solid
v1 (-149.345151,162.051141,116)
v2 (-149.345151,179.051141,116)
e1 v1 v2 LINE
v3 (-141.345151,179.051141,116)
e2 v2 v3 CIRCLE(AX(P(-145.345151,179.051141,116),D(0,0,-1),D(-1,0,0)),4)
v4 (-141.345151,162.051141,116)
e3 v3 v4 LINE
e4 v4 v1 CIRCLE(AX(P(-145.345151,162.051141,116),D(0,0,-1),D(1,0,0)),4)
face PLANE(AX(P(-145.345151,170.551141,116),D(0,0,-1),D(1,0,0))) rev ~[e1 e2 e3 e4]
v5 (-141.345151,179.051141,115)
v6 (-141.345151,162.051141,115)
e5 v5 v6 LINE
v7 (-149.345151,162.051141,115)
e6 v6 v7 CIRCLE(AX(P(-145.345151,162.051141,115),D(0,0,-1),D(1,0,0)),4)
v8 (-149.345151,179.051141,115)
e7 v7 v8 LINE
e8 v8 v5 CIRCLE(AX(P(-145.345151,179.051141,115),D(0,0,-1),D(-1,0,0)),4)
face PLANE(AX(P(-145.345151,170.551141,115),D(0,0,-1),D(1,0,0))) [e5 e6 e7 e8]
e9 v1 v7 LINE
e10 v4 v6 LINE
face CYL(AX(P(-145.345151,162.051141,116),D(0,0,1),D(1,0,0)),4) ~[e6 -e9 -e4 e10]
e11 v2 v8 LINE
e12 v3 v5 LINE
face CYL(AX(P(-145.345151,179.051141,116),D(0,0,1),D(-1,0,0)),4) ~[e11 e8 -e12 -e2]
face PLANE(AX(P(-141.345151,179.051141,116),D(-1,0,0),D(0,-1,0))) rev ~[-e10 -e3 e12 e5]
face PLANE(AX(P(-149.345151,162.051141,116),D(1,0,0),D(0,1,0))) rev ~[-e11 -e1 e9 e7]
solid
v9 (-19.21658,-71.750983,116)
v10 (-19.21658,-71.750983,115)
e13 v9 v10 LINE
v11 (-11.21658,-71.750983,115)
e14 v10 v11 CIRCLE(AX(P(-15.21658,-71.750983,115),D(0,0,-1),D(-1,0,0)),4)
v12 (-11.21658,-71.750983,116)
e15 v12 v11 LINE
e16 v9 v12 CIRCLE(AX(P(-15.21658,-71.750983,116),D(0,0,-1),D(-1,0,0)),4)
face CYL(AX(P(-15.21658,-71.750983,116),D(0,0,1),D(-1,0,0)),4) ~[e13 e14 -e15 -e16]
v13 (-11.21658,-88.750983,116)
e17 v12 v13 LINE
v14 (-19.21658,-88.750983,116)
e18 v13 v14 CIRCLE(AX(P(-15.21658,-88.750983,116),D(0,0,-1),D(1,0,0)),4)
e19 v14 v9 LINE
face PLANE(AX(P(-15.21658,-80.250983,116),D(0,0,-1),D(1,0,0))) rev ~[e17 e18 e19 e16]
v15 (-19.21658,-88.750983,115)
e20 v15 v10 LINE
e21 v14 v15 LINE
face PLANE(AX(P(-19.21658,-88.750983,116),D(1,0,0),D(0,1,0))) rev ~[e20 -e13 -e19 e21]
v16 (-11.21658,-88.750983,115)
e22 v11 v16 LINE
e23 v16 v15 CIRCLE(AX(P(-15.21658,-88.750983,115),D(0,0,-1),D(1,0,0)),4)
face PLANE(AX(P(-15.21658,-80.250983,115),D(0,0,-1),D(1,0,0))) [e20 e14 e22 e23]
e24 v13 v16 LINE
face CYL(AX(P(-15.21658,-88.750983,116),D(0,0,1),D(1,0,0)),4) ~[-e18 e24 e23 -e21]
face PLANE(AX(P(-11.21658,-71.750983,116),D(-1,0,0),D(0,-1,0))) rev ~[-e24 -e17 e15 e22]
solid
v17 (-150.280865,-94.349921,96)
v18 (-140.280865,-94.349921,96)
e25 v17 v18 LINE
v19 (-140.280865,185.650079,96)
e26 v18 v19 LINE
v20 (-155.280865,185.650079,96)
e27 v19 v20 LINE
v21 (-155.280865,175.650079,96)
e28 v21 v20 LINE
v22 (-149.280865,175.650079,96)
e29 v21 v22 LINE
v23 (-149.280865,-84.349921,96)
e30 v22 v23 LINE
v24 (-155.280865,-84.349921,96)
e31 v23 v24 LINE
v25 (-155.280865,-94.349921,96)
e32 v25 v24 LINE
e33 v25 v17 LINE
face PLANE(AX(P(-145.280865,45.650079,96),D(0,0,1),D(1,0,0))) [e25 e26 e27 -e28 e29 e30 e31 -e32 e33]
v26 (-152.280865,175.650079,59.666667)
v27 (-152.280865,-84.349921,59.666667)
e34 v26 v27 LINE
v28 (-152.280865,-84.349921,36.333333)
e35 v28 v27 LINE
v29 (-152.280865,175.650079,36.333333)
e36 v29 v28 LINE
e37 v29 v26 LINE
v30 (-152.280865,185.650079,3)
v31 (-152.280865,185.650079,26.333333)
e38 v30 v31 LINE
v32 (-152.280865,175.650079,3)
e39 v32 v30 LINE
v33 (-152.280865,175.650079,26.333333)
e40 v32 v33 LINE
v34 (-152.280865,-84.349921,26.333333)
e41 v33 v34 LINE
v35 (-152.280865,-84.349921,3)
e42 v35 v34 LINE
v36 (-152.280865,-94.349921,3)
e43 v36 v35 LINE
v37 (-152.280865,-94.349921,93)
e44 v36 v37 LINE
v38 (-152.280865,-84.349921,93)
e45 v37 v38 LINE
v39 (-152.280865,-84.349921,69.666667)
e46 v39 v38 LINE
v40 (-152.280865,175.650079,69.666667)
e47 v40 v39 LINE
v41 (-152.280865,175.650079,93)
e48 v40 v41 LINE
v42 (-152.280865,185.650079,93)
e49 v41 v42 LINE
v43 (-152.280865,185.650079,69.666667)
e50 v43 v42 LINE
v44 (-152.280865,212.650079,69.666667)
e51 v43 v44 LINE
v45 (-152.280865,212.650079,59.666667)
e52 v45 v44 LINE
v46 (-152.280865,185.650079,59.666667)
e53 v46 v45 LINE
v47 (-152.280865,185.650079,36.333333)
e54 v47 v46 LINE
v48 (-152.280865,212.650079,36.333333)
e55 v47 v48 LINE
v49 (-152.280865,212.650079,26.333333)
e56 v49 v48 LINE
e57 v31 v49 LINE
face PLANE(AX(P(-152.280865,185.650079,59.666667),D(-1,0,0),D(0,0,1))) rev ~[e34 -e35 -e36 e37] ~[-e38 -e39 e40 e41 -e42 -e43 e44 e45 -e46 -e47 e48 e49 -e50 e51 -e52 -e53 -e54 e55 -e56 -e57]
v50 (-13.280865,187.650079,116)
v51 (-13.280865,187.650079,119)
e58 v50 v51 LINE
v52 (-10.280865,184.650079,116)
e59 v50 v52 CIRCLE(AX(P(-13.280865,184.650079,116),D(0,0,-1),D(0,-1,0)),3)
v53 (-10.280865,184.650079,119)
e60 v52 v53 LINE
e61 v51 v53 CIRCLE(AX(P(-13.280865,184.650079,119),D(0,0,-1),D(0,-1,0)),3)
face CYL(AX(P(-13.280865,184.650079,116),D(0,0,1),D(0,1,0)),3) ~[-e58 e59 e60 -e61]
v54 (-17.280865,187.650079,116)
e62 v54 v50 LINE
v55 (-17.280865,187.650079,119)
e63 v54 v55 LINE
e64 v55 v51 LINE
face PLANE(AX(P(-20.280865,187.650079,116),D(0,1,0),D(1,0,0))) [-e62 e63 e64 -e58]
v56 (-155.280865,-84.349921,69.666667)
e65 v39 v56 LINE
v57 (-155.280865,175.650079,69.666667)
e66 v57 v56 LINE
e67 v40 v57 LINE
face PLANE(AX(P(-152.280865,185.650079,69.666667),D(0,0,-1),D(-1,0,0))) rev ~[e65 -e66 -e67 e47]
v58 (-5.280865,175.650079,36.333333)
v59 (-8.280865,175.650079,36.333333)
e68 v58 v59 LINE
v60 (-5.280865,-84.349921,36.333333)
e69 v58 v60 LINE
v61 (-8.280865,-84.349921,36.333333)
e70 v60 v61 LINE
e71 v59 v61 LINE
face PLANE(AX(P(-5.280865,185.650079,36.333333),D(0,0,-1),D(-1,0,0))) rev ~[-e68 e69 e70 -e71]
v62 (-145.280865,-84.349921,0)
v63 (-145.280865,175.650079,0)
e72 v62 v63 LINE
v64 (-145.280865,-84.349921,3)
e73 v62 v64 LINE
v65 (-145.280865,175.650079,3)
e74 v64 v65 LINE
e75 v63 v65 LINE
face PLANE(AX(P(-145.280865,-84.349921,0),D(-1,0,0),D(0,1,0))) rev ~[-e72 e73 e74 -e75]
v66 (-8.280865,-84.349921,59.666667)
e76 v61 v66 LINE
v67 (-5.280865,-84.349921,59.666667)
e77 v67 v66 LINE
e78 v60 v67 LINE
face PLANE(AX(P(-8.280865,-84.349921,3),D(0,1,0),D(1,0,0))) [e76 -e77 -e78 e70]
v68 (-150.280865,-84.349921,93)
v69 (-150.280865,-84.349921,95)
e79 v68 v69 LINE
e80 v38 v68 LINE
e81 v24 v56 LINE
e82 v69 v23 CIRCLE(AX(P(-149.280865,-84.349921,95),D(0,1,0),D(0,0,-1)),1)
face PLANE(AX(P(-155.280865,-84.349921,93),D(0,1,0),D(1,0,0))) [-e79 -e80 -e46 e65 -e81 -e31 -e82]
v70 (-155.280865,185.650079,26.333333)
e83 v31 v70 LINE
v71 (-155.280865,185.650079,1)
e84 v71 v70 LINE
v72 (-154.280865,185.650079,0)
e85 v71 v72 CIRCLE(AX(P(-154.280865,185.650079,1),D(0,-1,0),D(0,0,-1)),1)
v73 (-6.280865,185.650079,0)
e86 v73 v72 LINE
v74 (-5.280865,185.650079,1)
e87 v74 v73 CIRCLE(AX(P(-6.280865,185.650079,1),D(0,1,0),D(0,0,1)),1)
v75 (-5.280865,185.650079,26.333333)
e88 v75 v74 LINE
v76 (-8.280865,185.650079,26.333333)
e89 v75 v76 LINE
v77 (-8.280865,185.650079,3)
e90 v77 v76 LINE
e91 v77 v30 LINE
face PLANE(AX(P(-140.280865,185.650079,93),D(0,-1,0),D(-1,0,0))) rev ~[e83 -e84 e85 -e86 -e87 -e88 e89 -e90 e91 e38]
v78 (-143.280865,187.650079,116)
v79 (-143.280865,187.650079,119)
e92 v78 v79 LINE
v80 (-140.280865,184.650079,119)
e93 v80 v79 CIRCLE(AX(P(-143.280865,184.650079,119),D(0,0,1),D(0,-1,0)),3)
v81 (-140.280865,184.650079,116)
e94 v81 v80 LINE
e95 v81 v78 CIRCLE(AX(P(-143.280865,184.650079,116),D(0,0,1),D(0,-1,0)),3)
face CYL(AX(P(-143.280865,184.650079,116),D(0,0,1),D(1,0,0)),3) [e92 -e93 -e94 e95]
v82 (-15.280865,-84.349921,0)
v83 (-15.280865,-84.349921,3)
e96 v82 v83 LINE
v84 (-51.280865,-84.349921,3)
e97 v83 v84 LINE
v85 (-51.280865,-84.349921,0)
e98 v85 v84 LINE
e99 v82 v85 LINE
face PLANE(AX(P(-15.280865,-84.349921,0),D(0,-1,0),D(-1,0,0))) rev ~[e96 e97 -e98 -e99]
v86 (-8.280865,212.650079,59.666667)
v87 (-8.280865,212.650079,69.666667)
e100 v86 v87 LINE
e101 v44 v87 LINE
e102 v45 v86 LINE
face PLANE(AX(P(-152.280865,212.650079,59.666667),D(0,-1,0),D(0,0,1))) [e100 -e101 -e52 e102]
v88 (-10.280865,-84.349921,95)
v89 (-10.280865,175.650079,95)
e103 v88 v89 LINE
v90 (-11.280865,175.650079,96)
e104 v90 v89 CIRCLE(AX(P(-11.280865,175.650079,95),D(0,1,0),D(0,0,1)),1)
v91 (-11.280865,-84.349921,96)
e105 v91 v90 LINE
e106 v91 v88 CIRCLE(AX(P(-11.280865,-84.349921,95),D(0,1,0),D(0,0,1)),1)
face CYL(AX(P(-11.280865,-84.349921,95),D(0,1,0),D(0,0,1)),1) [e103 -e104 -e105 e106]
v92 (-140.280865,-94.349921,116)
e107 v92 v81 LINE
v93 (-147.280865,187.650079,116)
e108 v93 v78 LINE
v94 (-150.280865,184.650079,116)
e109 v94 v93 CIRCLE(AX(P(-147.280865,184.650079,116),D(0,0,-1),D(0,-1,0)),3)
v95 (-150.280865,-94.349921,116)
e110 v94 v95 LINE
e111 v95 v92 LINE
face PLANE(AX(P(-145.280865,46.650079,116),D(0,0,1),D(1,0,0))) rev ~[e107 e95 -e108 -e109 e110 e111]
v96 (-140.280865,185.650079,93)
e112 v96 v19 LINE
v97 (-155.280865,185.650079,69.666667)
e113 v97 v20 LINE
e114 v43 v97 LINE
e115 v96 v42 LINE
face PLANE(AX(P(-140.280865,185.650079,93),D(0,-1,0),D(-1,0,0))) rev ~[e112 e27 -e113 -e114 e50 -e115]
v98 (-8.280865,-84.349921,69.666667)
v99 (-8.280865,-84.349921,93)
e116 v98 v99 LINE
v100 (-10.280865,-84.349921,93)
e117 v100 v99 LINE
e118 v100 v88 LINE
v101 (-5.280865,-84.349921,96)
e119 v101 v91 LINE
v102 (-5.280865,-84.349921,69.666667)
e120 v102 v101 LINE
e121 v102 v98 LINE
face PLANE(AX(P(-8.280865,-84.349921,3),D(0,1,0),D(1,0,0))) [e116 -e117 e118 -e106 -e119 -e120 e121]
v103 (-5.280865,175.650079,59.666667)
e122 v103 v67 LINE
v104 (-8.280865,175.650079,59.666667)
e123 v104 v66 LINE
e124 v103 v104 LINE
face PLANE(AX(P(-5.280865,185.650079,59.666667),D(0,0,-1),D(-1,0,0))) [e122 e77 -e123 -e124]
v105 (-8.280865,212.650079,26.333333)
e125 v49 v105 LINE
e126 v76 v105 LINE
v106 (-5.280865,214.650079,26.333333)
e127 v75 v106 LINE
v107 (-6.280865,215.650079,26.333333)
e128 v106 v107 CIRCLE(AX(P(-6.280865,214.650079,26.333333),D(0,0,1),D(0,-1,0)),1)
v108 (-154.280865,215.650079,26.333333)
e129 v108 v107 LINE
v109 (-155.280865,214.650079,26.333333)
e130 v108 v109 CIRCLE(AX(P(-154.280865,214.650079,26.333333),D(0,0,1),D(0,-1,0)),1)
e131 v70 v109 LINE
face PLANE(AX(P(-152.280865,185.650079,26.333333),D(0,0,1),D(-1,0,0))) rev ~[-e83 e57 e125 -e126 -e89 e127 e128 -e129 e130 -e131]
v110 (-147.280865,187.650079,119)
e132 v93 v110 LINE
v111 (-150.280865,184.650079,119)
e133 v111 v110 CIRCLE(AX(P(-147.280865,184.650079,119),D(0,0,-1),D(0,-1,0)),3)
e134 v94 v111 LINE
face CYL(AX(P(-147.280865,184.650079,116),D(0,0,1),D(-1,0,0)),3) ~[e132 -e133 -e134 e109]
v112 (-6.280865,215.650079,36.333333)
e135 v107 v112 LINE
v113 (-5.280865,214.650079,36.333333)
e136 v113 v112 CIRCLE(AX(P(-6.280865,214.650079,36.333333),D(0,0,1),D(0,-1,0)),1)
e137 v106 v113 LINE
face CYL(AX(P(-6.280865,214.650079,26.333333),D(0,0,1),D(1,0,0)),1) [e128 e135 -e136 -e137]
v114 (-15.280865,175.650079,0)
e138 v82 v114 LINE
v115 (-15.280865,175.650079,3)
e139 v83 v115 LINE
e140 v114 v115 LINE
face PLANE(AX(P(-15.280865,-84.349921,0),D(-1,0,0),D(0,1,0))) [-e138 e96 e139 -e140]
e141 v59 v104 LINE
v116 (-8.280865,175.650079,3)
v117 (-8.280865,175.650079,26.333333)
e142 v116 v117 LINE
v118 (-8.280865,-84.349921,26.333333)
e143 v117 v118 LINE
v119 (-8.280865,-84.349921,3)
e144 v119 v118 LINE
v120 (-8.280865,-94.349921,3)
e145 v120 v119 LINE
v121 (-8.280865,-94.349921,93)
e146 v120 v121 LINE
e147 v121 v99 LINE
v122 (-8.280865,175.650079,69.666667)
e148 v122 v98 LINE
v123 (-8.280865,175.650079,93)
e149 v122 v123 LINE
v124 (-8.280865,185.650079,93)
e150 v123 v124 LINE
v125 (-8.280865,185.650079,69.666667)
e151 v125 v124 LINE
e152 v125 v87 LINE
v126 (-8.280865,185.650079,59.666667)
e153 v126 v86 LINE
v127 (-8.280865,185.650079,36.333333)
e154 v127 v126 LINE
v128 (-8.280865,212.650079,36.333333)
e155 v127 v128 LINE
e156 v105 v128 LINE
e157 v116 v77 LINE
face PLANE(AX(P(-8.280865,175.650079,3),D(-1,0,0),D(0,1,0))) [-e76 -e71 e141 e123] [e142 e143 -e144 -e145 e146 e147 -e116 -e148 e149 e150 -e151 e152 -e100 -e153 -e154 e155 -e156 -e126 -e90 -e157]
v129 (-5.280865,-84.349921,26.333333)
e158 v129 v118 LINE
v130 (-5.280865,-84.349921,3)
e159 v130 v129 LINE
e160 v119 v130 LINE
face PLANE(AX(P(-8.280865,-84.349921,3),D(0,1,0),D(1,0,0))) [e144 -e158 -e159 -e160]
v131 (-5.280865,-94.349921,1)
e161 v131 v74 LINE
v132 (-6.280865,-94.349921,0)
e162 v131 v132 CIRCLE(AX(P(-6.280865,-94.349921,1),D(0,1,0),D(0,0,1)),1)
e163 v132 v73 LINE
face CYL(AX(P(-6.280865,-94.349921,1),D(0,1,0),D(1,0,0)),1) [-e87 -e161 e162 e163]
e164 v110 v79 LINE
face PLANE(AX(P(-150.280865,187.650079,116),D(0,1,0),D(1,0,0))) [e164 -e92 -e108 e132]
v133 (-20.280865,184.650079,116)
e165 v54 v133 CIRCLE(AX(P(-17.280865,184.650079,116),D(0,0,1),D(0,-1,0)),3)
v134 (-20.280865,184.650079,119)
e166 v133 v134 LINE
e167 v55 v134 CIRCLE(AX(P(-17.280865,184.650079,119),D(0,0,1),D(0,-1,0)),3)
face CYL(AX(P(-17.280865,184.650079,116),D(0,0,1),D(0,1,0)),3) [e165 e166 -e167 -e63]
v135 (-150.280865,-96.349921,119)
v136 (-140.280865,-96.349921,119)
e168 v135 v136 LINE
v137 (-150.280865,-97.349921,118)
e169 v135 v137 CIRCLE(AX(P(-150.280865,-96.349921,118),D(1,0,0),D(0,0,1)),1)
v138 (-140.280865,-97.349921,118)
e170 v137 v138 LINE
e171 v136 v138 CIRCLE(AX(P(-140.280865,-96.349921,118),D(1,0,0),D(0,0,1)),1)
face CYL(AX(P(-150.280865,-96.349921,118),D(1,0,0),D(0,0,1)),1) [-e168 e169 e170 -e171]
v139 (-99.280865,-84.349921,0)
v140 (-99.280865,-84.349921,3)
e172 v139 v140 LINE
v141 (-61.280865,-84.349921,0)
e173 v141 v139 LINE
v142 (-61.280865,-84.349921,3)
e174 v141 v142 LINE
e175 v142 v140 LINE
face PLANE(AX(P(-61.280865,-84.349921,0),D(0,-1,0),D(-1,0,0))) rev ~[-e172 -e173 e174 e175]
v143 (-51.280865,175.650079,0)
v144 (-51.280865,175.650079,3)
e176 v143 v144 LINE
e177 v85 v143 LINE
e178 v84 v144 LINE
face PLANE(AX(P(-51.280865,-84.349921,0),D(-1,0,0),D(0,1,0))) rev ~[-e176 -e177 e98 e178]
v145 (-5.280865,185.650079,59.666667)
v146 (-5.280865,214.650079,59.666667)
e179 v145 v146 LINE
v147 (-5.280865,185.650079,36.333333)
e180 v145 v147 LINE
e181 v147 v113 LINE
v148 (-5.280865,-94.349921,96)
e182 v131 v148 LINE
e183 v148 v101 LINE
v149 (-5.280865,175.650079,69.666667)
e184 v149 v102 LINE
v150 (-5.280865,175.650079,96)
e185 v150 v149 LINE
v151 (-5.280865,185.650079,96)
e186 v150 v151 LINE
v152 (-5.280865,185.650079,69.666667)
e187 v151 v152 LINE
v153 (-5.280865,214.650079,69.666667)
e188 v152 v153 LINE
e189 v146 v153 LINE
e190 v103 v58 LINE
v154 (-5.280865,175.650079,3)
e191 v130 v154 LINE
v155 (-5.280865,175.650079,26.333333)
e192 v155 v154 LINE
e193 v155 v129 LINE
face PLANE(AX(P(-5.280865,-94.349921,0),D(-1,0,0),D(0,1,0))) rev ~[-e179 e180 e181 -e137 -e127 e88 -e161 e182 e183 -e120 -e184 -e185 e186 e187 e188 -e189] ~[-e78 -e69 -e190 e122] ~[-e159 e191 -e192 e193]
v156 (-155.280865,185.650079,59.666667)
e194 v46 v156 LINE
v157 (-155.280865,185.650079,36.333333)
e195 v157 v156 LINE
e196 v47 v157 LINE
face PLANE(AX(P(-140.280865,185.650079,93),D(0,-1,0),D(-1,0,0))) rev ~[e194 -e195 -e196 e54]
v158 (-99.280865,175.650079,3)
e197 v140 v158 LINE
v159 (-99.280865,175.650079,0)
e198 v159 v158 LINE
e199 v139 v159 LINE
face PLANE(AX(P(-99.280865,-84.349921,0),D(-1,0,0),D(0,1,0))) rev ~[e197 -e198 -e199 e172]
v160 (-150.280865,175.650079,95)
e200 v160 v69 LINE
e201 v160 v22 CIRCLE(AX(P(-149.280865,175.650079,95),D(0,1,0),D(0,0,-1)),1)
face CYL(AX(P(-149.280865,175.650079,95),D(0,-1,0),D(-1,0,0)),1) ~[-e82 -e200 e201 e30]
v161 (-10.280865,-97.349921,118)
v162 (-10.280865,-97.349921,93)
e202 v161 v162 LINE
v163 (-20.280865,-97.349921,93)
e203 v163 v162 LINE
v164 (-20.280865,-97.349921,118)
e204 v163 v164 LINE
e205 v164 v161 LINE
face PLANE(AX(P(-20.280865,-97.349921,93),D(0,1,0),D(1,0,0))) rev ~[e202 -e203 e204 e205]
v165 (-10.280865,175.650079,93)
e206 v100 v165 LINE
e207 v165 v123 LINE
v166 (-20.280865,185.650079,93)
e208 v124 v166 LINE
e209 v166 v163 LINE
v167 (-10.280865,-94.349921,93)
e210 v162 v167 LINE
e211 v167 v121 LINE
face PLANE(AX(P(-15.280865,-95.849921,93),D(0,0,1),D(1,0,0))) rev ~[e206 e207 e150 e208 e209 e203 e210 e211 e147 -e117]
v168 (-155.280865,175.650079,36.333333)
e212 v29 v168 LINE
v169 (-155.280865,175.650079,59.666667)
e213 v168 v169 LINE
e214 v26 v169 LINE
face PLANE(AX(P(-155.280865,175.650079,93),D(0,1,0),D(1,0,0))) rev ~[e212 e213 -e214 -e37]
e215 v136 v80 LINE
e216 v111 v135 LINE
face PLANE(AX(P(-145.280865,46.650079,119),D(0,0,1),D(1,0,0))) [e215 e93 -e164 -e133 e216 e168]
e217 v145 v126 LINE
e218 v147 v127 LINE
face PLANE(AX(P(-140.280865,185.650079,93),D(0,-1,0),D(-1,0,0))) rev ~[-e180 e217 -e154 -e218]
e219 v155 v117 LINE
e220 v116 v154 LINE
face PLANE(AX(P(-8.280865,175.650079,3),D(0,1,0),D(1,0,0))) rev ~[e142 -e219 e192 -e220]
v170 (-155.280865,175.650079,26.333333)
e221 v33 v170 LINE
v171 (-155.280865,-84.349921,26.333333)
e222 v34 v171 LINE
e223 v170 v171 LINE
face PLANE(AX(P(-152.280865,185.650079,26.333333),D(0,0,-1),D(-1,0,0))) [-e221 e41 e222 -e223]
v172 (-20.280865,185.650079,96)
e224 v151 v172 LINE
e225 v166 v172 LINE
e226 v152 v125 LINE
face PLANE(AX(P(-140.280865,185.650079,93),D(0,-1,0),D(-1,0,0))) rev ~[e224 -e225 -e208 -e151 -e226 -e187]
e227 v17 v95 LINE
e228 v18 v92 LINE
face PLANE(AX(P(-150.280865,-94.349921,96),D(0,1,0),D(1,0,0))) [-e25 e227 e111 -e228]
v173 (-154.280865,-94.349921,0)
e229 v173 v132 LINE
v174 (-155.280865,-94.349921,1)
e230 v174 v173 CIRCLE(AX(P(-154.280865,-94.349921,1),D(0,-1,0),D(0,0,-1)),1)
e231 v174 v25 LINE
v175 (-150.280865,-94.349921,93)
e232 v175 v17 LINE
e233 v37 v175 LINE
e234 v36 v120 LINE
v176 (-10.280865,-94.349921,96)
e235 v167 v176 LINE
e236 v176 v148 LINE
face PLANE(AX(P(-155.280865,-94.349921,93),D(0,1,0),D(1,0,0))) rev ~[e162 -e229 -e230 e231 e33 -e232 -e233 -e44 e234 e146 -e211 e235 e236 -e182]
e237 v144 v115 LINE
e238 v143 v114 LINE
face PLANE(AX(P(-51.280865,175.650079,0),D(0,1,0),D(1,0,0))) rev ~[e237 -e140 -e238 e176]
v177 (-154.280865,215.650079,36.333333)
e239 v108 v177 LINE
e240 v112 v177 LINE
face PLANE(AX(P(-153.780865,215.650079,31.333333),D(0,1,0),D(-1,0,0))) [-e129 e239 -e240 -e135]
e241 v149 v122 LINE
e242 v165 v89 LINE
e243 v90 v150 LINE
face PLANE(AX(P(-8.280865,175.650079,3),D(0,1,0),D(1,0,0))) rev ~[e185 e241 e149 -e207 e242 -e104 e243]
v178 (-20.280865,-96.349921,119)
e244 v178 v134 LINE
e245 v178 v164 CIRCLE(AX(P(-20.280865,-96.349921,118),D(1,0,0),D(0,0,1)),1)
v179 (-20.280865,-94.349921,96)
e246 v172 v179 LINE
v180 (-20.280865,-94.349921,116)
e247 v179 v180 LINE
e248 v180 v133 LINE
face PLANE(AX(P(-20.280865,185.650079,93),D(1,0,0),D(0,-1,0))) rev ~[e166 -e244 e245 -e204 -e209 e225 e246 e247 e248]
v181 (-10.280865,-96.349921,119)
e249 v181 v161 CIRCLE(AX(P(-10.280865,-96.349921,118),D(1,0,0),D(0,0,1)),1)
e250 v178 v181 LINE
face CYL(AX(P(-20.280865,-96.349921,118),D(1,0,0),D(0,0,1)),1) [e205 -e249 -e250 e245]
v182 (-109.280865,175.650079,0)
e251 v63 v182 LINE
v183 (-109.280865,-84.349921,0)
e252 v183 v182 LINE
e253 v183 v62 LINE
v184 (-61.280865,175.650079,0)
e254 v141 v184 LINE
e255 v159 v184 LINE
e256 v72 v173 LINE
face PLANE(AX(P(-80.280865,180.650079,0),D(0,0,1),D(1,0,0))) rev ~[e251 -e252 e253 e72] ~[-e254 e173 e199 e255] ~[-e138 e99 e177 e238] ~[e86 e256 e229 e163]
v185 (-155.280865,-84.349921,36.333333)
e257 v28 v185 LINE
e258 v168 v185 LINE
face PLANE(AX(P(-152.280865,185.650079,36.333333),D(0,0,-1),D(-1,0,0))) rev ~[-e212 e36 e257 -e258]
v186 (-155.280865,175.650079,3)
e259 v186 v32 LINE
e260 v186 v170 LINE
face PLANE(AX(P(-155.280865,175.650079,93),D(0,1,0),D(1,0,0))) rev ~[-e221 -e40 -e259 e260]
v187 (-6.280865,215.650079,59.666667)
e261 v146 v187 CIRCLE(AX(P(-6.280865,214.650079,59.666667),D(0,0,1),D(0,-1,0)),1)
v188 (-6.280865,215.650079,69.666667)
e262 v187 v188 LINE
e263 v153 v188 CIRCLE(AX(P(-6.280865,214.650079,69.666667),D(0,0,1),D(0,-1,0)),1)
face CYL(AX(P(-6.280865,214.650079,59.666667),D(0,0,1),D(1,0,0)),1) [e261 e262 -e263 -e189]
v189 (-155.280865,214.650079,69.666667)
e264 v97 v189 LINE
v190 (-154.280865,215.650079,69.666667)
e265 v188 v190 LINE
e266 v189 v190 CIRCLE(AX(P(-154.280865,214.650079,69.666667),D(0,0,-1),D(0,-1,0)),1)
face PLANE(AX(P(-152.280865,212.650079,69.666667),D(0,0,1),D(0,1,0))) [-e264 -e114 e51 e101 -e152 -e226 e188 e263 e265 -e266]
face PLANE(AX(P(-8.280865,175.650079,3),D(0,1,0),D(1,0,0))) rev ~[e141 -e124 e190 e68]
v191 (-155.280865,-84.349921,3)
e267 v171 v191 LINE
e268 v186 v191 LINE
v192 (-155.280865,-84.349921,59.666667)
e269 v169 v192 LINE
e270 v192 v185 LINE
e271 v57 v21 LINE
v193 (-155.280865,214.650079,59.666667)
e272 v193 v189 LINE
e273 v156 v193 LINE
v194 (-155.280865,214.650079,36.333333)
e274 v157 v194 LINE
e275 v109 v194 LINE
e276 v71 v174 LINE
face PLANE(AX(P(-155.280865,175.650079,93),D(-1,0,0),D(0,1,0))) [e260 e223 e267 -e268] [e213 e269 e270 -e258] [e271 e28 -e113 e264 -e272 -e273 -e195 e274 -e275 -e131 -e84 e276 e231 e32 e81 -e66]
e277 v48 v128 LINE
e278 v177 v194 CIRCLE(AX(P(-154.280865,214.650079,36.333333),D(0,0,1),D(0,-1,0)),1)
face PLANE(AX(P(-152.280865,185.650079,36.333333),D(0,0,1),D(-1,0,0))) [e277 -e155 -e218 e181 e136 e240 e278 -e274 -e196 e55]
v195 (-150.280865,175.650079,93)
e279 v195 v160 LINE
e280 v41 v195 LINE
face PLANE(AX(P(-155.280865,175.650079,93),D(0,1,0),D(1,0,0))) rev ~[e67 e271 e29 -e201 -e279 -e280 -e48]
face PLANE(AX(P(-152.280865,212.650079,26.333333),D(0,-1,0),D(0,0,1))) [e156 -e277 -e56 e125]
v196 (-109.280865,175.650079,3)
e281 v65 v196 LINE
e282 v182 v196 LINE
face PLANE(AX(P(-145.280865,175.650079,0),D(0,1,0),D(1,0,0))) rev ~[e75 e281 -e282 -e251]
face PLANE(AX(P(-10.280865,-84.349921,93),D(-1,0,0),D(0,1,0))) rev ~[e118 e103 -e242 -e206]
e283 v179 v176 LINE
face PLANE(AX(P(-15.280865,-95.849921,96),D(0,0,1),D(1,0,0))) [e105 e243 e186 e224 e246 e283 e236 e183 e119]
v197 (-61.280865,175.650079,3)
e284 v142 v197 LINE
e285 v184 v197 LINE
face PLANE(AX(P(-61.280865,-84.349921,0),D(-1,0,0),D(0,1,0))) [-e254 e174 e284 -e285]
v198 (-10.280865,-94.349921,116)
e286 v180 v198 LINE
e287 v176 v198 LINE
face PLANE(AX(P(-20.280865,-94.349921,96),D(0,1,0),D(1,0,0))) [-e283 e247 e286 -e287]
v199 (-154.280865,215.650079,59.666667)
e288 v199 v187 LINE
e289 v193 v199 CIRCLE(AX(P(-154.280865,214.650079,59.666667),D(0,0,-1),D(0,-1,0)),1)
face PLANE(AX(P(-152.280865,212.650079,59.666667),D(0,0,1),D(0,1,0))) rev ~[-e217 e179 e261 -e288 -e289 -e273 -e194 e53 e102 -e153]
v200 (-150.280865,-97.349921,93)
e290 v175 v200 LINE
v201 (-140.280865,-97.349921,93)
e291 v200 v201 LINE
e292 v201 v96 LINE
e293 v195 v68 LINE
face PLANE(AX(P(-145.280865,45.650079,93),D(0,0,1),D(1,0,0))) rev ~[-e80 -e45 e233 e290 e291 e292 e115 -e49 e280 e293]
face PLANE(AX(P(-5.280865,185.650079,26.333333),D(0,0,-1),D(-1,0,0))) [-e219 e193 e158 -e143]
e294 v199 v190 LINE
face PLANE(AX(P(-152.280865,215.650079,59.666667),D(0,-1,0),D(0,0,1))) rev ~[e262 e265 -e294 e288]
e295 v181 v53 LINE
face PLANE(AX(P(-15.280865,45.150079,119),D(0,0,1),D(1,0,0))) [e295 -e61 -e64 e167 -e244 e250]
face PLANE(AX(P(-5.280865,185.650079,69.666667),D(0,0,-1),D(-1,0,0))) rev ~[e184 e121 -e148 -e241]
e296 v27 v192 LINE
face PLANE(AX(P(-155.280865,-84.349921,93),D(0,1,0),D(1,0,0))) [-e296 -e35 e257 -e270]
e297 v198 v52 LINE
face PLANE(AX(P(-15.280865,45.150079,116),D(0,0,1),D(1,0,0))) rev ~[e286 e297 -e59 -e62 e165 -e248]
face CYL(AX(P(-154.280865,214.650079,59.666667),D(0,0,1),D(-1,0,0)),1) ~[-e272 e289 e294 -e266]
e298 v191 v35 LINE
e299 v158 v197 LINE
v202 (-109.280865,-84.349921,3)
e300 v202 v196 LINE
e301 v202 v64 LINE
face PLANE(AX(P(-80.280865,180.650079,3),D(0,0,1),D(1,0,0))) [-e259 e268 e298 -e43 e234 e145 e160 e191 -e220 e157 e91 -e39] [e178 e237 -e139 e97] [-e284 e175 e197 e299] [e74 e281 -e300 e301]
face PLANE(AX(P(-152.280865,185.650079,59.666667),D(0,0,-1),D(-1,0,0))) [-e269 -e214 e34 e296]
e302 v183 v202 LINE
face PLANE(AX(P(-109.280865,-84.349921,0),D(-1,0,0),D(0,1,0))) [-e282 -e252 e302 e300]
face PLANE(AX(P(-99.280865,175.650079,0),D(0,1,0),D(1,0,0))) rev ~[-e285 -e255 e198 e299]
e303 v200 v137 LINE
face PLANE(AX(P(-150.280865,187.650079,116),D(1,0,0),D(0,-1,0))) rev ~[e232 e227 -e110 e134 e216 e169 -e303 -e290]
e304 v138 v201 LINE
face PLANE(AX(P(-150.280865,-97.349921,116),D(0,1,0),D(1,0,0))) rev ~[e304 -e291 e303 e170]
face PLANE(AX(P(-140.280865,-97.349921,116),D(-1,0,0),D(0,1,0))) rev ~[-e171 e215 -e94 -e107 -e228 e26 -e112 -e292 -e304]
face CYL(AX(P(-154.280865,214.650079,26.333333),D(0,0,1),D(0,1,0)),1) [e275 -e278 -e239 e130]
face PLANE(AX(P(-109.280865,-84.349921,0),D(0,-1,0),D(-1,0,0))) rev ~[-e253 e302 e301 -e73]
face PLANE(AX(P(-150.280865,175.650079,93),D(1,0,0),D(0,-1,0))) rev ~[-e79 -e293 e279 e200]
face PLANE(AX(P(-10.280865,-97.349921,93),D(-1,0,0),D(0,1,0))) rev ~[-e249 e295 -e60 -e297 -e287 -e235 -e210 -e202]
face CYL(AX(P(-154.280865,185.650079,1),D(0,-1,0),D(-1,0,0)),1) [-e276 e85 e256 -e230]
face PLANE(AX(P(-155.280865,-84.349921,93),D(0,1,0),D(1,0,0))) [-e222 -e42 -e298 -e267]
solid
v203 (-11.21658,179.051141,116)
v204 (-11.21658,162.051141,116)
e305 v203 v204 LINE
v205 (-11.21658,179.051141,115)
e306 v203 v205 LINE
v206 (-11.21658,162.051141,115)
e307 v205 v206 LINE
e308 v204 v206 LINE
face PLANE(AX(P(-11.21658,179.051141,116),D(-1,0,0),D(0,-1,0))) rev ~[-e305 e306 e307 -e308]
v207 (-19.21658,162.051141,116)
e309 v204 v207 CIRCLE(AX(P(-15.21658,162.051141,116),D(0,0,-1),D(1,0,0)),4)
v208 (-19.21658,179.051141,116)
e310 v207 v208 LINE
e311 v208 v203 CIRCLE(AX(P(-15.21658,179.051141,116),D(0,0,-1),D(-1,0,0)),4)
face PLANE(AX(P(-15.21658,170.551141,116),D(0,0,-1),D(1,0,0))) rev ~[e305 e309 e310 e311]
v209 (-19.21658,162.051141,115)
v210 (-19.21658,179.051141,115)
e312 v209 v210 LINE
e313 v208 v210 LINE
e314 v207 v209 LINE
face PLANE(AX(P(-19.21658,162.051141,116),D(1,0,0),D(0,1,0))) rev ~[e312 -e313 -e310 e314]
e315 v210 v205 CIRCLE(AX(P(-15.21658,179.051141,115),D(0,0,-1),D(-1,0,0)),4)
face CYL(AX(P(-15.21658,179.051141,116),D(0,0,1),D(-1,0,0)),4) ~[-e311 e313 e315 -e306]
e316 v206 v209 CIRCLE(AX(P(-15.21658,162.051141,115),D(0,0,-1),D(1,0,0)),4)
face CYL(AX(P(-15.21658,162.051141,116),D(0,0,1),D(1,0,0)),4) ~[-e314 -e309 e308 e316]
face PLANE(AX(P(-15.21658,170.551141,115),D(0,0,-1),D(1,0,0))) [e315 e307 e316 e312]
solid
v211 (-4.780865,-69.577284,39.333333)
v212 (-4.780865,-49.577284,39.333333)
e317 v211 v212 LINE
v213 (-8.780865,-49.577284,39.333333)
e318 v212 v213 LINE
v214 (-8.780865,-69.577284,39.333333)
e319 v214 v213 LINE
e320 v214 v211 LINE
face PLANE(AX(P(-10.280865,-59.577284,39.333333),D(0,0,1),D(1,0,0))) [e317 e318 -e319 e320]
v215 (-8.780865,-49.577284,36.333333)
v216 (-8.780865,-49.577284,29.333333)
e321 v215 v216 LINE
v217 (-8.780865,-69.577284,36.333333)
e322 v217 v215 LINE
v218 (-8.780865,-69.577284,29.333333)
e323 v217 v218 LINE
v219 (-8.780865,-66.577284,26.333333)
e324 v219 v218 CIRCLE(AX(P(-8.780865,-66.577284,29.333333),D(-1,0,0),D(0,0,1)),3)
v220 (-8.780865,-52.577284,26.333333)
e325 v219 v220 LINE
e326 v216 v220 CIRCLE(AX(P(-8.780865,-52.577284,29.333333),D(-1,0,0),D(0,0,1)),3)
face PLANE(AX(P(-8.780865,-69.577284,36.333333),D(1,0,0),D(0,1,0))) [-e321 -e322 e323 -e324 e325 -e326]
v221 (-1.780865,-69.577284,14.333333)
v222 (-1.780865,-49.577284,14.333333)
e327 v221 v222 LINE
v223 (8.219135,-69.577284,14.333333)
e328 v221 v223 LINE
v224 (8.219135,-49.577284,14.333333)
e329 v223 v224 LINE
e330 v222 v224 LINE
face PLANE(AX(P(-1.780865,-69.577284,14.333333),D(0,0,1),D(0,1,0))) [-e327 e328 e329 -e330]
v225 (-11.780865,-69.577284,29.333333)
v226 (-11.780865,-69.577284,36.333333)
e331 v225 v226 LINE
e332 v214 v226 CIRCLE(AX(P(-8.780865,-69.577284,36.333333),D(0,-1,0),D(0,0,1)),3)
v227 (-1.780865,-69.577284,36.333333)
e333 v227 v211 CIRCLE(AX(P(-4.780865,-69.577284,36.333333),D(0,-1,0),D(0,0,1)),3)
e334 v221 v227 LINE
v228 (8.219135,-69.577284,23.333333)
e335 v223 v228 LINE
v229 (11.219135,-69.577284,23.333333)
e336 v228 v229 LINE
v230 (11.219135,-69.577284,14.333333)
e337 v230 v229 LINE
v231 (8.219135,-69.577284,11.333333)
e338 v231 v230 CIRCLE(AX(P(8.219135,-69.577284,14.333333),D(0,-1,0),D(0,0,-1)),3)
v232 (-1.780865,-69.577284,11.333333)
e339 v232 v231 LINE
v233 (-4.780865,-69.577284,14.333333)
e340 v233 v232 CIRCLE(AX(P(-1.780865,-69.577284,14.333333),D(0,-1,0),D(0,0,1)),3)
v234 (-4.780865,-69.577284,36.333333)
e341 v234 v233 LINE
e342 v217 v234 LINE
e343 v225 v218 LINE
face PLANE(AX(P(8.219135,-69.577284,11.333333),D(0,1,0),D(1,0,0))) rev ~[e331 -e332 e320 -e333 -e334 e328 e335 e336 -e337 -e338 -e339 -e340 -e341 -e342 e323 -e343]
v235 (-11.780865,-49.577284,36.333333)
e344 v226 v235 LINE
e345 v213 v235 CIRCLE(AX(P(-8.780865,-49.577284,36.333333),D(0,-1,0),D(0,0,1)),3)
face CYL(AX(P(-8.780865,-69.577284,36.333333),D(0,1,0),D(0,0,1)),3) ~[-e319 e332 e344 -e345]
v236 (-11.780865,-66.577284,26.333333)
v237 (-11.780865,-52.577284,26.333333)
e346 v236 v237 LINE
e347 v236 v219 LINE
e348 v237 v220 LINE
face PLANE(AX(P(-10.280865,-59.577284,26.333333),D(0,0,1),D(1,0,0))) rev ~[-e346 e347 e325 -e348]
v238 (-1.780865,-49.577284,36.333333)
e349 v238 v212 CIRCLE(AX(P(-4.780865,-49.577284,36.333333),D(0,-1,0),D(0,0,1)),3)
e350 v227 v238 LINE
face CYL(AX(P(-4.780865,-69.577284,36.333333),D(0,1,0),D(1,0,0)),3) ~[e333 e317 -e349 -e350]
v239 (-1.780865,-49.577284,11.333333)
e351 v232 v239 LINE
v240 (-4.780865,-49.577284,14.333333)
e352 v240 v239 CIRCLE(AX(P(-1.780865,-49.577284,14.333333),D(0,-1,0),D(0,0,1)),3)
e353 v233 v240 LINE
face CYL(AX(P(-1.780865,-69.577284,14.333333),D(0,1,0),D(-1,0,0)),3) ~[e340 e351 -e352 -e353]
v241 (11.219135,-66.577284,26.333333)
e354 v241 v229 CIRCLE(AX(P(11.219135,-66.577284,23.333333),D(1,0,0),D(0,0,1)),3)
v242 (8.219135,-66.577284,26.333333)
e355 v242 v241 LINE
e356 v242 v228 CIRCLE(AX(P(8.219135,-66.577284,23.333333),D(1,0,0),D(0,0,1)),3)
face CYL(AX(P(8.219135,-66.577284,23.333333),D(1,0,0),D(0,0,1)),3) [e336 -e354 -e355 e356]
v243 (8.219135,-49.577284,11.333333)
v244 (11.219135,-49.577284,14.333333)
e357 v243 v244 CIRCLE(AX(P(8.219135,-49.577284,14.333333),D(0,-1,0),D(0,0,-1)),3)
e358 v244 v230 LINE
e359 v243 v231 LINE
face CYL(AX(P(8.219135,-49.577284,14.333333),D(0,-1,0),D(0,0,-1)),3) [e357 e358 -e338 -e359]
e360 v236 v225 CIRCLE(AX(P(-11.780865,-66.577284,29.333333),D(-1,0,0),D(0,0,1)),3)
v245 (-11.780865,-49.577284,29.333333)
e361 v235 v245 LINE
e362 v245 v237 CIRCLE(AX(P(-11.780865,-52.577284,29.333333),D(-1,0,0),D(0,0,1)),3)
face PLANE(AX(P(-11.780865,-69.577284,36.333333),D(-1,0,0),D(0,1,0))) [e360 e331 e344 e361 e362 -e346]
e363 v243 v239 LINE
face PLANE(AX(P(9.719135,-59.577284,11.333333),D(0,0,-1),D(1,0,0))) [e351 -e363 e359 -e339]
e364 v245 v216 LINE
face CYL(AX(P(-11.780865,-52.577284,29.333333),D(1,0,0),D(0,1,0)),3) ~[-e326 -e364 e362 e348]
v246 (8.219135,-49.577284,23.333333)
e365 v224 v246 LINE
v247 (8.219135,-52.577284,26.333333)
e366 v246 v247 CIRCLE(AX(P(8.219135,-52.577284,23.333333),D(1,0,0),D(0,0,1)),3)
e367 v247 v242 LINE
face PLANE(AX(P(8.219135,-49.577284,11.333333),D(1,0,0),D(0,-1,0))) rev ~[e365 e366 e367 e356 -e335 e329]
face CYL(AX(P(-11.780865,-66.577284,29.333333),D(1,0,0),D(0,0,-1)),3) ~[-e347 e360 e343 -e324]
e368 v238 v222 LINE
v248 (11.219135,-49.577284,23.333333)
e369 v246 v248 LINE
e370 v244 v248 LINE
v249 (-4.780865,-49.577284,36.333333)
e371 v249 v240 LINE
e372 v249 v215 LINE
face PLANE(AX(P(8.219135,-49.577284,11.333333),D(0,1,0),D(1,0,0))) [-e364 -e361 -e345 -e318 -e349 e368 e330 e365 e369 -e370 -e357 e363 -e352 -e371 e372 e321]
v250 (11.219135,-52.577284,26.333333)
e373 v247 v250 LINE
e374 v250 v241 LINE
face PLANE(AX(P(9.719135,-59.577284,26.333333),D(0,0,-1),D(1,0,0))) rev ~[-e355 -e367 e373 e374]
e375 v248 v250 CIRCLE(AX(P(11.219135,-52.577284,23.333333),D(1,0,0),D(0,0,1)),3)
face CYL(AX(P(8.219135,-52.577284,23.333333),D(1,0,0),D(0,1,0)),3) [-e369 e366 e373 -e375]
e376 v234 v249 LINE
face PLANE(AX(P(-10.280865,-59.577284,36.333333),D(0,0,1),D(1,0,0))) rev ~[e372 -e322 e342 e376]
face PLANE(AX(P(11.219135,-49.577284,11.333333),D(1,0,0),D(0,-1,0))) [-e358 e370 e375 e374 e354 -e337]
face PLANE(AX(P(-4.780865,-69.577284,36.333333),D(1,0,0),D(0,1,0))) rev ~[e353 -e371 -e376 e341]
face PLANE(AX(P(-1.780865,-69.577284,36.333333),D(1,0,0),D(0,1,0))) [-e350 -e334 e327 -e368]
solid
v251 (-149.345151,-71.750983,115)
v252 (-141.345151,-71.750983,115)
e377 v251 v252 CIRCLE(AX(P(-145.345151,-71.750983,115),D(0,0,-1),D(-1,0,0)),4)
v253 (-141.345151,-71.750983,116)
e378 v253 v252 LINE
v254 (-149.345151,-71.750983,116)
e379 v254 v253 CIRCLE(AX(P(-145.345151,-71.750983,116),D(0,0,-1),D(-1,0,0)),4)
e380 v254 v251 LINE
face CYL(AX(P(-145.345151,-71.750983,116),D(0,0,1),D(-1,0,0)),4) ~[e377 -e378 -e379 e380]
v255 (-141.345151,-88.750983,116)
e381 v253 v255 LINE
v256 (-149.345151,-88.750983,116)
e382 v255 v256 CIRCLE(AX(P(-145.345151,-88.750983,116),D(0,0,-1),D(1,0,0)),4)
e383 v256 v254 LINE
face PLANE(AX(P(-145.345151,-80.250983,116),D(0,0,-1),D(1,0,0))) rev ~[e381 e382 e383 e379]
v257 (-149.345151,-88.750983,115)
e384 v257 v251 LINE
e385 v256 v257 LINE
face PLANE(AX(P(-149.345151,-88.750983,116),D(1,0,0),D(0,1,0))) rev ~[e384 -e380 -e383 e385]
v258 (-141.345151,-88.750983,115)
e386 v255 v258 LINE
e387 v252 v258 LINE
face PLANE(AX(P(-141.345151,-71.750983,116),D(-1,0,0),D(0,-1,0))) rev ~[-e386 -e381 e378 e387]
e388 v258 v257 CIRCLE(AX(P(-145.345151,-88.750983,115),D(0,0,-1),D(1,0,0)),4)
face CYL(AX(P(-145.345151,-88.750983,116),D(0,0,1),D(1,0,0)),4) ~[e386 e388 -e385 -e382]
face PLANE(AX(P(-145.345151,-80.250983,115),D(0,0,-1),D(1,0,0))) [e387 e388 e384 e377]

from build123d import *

# Parameters (mm, degrees)
F0_W           = 10
F0_H           = 260
F1_DEPTH       = 3
F2_W           = 3
F2_H           = 10
F3_DEPTH       = 90
F4_W           = 2
F4_H           = 10
F4_W_2         = 3
F4_W_3         = 10
F4_H_2         = 3
F4_W_4         = 5
F5_DEPTH       = 3
F6_W           = 10
F6_H           = 3
F7_DEPTH       = 20
F8_W           = 10
F8_H           = 282
F8_H_2         = 285
F8_H_3         = 3
F9_DEPTH       = 3
F10_W          = 3
F10_H          = 10
F11_DEPTH      = 30
F11_DEPTH_BACK = 270
F12_W          = 3
F12_H          = 10
F13_DEPTH      = 144
F14_R          = 1
F15_R          = 3
F17_DEPTH      = 1
F18_W          = 3
F18_H          = 20
F19_DEPTH      = 10
F18_W_2        = 0.5
F20_DEPTH      = 3
F21_DEPTH      = 25
F22_W          = 20
F22_H          = 3
F23_DEPTH      = 10
F24_W          = 3
F24_H          = 20
F25_DEPTH      = 15
F26_R          = 3


# Not quite as in the source:
# - a feature names something its author has since deleted; it is built from what else it names


with BuildPart() as f1:
    # F0 (on Top) → F1 (new body)
    with BuildSketch(Plane.XY):
        Polygon((-5.2808651924, 185.6500792865), (-155.2808651924, 185.6500792865), (-155.2808651924, 175.6500792865), (-145.2808651924, 175.6500792865), (-109.2808651924, 175.6500792865), (-99.2808651924, 175.6500792865), (-61.2808651924, 175.6500792865), (-51.2808651924, 175.6500792865), (-15.2808651924, 175.6500792865), (-5.2808651924, 175.6500792865), align=None)
        with Locations((-104.2808651924, 45.6500792865)):
            Rectangle(F0_W, F0_H)
        with Locations((-56.2808651924, 45.6500792865)):
            Rectangle(F0_W, F0_H)
        Polygon((-145.2808651924, -84.3499207135), (-155.2808651924, -84.3499207135), (-155.2808651924, -94.3499207135), (-5.2808651924, -94.3499207135), (-5.2808651924, -84.3499207135), (-15.2808651924, -84.3499207135), (-51.2808651924, -84.3499207135), (-61.2808651924, -84.3499207135), (-99.2808651924, -84.3499207135), (-109.2808651924, -84.3499207135), align=None)
        with Locations((-150.2808651924, 45.6500792865)):
            Rectangle(F0_W, F0_H)
        with Locations((-10.2808651924, 45.6500792865)):
            Rectangle(F0_W, F0_H)
    extrude(amount=F1_DEPTH)

    # F2 (on face) → F3 (join)
    with BuildSketch(Plane.XY.offset(3)):
        with Locations((-153.7808651924, 180.6500792865)):
            Rectangle(F2_W, F2_H)
        with Locations((-6.7808651924, 180.6500792865)):
            Rectangle(F2_W, F2_H)
        with Locations((-6.7808651924, -89.3499207135)):
            Rectangle(F2_W, F2_H)
        with Locations((-153.7808651924, -89.3499207135)):
            Rectangle(F2_W, F2_H)
    extrude(amount=F3_DEPTH)

    # F4 (on face) → F5 (join)
    with BuildSketch(Plane.XY.offset(93)):
        Polygon((-140.2808651924, 185.6500792865), (-150.2808651924, 185.6500792865), (-150.2808651924, 175.6500792865), (-150.2808651924, -84.3499207135), (-150.2808651924, -94.3499207135), (-140.2808651924, -94.3499207135), align=None)
        with Locations((-151.2808651924, 180.6500792865)):
            Rectangle(F4_W, F4_H)
        with Locations((-153.7808651924, 180.6500792865)):
            Rectangle(F4_W_2, F4_H)
        with Locations((-145.2808651924, -95.8499207135)):
            Rectangle(F4_W_3, F4_H_2)
        with Locations((-15.2808651924, -95.8499207135)):
            Rectangle(F4_W_3, F4_H_2)
        Polygon((-10.2808651924, 185.6500792865), (-20.2808651924, 185.6500792865), (-20.2808651924, -94.3499207135), (-10.2808651924, -94.3499207135), (-10.2808651924, -84.3499207135), (-10.2808651924, 175.6500792865), align=None)
        with Locations((-7.7808651924, -89.3499207135)):
            Rectangle(F4_W_4, F4_H)
        with Locations((-7.7808651924, 180.6500792865)):
            Rectangle(F4_W_4, F4_H)
        with Locations((-152.7808651924, -89.3499207135)):
            Rectangle(F4_W_4, F4_H)
    extrude(amount=F5_DEPTH)

    # F6 (on face) → F7 (join)
    with BuildSketch(Plane.XY.offset(96)):
        with Locations((-145.2808651924, -95.8499207135)):
            Rectangle(F6_W, F6_H)
        with Locations((-15.2808651924, -95.8499207135)):
            Rectangle(F6_W, F6_H)
    extrude(amount=F7_DEPTH)

    # F8 (on face) → F9 (join)
    with BuildSketch(Plane.XY.offset(116)):
        with Locations((-145.2808651924, 46.6500792865)):
            Rectangle(F8_W, F8_H)
        with Locations((-15.2808651924, 45.1500792865)):
            Rectangle(F8_W, F8_H_2)
        with Locations((-145.2808651924, -95.8499207135)):
            Rectangle(F8_W, F8_H_3)
    extrude(amount=F9_DEPTH)

    # F10 (on face) → F11 (join, two sides)
    with BuildSketch(Plane(origin=(0, 185.6500792865, 0), x_dir=(-1, 0, 0), z_dir=(0, 1, 0))) as f11_sk:
        with Locations((153.7808651924, 64.6666666667)):
            Rectangle(F10_W, F10_H)
        with Locations((153.7808651924, 31.3333333333)):
            Rectangle(F10_W, F10_H)
        with Locations((6.7808651924, 64.6666666667)):
            Rectangle(F10_W, F10_H)
        with Locations((6.7808651924, 31.3333333333)):
            Rectangle(F10_W, F10_H)
    extrude(amount=F11_DEPTH)
    extrude(f11_sk.sketch, amount=-F11_DEPTH_BACK)

    # F12 (on face) → F13 (join, through all)
    with BuildSketch(Plane.YZ.offset(-152.2808651924)):
        with Locations((214.1500792864, 64.6666666667)):
            Rectangle(F12_W, F12_H)
        with Locations((214.1500792864, 31.3333333333)):
            Rectangle(F12_W, F12_H)
    extrude(amount=F13_DEPTH)

    # F14
    f14_edges = [f1.edges().sort_by_distance(p)[0] for p in [
        (-155.280865, 45.650079, 0),
        (-5.280865, 45.650079, 0),
        (-5.280865, 215.650079, 31.333333),
        (-5.280865, 215.650079, 64.666667),
        (-155.280865, 215.650079, 64.666667),
        (-155.280865, 215.650079, 31.333333),
        (-150.280865, 45.650079, 96),
        (-145.280865, -97.349921, 119),
        (-15.280865, -97.349921, 119),
        (-10.280865, 45.650079, 96),
    ]]
    fillet(f14_edges, radius=F14_R)

    # F15
    f15_edges = [f1.edges().sort_by_distance(p)[0] for p in [
        (-140.280865, 187.650079, 117.5),
        (-150.280865, 187.650079, 117.5),
        (-20.280865, 187.650079, 117.5),
        (-10.280865, 187.650079, 117.5),
    ]]
    fillet(f15_edges, radius=F15_R)


with BuildPart() as f17:
    # F16 (on face) → F17 (new body)
    with BuildSketch(Plane(origin=(0, 0, 116), x_dir=(1, 0, 0), z_dir=(0, 0, -1))):
        with BuildLine():
            ThreePointArc((-149.3451507241, -179.0511412621), (-145.3451507241, -183.0511412621), (-141.3451507241, -179.0511412621))
            Line((-141.3451507241, -179.0511412621), (-141.3451507241, -162.0511412621))
            ThreePointArc((-141.3451507241, -162.0511412621), (-145.3451507241, -158.0511412621), (-149.3451507241, -162.0511412621))
            Line((-149.3451507241, -162.0511412621), (-149.3451507241, -179.0511412621))
        make_face()
    extrude(amount=F17_DEPTH)


with BuildPart() as f17b:
    # F16 (on face) → F17, piece 2 (new body)
    with BuildSketch(Plane(origin=(0, 0, 116), x_dir=(1, 0, 0), z_dir=(0, 0, -1))):
        with BuildLine():
            ThreePointArc((-11.2165796608, -162.0511412621), (-15.2165796608, -158.0511412621), (-19.2165796608, -162.0511412621))
            Line((-19.2165796608, -162.0511412621), (-19.2165796608, -179.0511412621))
            ThreePointArc((-19.2165796608, -179.0511412621), (-15.2165796608, -183.0511412621), (-11.2165796608, -179.0511412621))
            Line((-11.2165796608, -179.0511412621), (-11.2165796608, -162.0511412621))
        make_face()
    extrude(amount=F17_DEPTH)


with BuildPart() as f17c:
    # F16 (on face) → F17, piece 3 (new body)
    with BuildSketch(Plane(origin=(0, 0, 116), x_dir=(1, 0, 0), z_dir=(0, 0, -1))):
        with BuildLine():
            ThreePointArc((-11.2165796608, 88.7509826891), (-15.2165796608, 92.7509826891), (-19.2165796608, 88.7509826891))
            Line((-19.2165796608, 88.7509826891), (-19.2165796608, 71.7509826891))
            ThreePointArc((-19.2165796608, 71.7509826891), (-15.2165796608, 67.7509826891), (-11.2165796608, 71.7509826891))
            Line((-11.2165796608, 71.7509826891), (-11.2165796608, 88.7509826891))
        make_face()
    extrude(amount=F17_DEPTH)


with BuildPart() as f17d:
    # F16 (on face) → F17, piece 4 (new body)
    with BuildSketch(Plane(origin=(0, 0, 116), x_dir=(1, 0, 0), z_dir=(0, 0, -1))):
        with BuildLine():
            Line((-149.3451507241, 88.7509826891), (-149.3451507241, 71.7509826891))
            ThreePointArc((-149.3451507241, 71.7509826891), (-145.3451507241, 67.7509826891), (-141.3451507241, 71.7509826891))
            Line((-141.3451507241, 71.7509826891), (-141.3451507241, 88.7509826891))
            ThreePointArc((-141.3451507241, 88.7509826891), (-145.3451507241, 92.7509826891), (-149.3451507241, 88.7509826891))
        make_face()
    extrude(amount=F17_DEPTH)


with BuildPart() as f19:
    # F18 (on face) → F19 (new body, through all)
    with BuildSketch(Plane.XY.offset(36.3333333333)):
        with Locations((-10.2808651924, -59.5772841573)):
            Rectangle(F18_W, F18_H)
    extrude(amount=-F19_DEPTH)

    # F18 (on face) → F20 (join)
    with BuildSketch(Plane.XY.offset(36.3333333333)):
        with Locations((-10.2808651924, -59.5772841573)):
            Rectangle(F18_W, F18_H)
        with Locations((-6.7808651924, -59.5772841573)):
            Rectangle(F18_W, F18_H)
        with Locations((-8.5308651924, -59.5772841573)):
            Rectangle(F18_W_2, F18_H)
        with Locations((-5.0308651924, -59.5772841573)):
            Rectangle(F18_W_2, F18_H)
        with Locations((-3.2808651924, -59.5772841573)):
            Rectangle(F18_W, F18_H)
    extrude(amount=F20_DEPTH)

    # F18 (on face) → F21 (join)
    with BuildSketch(Plane.XY.offset(36.3333333333)):
        with Locations((-3.2808651924, -59.5772841573)):
            Rectangle(F18_W, F18_H)
    extrude(amount=-F21_DEPTH)

    # F22 (on face) → F23 (join)
    with BuildSketch(Plane.YZ.offset(-1.7808651924)):
        with Locations((-59.5772841573, 12.8333333333)):
            Rectangle(F22_W, F22_H)
    extrude(amount=F23_DEPTH)

    # F24 (on face) → F25 (join)
    with BuildSketch(Plane(origin=(0, 0, 11.3333333333), x_dir=(1, 0, 0), z_dir=(0, 0, -1))):
        with Locations((9.7191348076, 59.5772841573)):
            Rectangle(F24_W, F24_H)
    extrude(amount=-F25_DEPTH)

    # F26
    f26_edges = [f19.edges().sort_by_distance(p)[0] for p in [
        (9.719135, -69.577284, 26.333333),
        (9.719135, -49.577284, 26.333333),
        (11.219135, -59.577284, 11.333333),
        (-4.780865, -59.577284, 11.333333),
        (-1.780865, -59.577284, 39.333333),
        (-11.780865, -59.577284, 39.333333),
        (-10.280865, -69.577284, 26.333333),
        (-10.280865, -49.577284, 26.333333),
    ]]
    fillet(f26_edges, radius=F26_R)


solid = Compound([f1.part, f17.part, f17b.part, f17c.part, f17d.part, f19.part])
